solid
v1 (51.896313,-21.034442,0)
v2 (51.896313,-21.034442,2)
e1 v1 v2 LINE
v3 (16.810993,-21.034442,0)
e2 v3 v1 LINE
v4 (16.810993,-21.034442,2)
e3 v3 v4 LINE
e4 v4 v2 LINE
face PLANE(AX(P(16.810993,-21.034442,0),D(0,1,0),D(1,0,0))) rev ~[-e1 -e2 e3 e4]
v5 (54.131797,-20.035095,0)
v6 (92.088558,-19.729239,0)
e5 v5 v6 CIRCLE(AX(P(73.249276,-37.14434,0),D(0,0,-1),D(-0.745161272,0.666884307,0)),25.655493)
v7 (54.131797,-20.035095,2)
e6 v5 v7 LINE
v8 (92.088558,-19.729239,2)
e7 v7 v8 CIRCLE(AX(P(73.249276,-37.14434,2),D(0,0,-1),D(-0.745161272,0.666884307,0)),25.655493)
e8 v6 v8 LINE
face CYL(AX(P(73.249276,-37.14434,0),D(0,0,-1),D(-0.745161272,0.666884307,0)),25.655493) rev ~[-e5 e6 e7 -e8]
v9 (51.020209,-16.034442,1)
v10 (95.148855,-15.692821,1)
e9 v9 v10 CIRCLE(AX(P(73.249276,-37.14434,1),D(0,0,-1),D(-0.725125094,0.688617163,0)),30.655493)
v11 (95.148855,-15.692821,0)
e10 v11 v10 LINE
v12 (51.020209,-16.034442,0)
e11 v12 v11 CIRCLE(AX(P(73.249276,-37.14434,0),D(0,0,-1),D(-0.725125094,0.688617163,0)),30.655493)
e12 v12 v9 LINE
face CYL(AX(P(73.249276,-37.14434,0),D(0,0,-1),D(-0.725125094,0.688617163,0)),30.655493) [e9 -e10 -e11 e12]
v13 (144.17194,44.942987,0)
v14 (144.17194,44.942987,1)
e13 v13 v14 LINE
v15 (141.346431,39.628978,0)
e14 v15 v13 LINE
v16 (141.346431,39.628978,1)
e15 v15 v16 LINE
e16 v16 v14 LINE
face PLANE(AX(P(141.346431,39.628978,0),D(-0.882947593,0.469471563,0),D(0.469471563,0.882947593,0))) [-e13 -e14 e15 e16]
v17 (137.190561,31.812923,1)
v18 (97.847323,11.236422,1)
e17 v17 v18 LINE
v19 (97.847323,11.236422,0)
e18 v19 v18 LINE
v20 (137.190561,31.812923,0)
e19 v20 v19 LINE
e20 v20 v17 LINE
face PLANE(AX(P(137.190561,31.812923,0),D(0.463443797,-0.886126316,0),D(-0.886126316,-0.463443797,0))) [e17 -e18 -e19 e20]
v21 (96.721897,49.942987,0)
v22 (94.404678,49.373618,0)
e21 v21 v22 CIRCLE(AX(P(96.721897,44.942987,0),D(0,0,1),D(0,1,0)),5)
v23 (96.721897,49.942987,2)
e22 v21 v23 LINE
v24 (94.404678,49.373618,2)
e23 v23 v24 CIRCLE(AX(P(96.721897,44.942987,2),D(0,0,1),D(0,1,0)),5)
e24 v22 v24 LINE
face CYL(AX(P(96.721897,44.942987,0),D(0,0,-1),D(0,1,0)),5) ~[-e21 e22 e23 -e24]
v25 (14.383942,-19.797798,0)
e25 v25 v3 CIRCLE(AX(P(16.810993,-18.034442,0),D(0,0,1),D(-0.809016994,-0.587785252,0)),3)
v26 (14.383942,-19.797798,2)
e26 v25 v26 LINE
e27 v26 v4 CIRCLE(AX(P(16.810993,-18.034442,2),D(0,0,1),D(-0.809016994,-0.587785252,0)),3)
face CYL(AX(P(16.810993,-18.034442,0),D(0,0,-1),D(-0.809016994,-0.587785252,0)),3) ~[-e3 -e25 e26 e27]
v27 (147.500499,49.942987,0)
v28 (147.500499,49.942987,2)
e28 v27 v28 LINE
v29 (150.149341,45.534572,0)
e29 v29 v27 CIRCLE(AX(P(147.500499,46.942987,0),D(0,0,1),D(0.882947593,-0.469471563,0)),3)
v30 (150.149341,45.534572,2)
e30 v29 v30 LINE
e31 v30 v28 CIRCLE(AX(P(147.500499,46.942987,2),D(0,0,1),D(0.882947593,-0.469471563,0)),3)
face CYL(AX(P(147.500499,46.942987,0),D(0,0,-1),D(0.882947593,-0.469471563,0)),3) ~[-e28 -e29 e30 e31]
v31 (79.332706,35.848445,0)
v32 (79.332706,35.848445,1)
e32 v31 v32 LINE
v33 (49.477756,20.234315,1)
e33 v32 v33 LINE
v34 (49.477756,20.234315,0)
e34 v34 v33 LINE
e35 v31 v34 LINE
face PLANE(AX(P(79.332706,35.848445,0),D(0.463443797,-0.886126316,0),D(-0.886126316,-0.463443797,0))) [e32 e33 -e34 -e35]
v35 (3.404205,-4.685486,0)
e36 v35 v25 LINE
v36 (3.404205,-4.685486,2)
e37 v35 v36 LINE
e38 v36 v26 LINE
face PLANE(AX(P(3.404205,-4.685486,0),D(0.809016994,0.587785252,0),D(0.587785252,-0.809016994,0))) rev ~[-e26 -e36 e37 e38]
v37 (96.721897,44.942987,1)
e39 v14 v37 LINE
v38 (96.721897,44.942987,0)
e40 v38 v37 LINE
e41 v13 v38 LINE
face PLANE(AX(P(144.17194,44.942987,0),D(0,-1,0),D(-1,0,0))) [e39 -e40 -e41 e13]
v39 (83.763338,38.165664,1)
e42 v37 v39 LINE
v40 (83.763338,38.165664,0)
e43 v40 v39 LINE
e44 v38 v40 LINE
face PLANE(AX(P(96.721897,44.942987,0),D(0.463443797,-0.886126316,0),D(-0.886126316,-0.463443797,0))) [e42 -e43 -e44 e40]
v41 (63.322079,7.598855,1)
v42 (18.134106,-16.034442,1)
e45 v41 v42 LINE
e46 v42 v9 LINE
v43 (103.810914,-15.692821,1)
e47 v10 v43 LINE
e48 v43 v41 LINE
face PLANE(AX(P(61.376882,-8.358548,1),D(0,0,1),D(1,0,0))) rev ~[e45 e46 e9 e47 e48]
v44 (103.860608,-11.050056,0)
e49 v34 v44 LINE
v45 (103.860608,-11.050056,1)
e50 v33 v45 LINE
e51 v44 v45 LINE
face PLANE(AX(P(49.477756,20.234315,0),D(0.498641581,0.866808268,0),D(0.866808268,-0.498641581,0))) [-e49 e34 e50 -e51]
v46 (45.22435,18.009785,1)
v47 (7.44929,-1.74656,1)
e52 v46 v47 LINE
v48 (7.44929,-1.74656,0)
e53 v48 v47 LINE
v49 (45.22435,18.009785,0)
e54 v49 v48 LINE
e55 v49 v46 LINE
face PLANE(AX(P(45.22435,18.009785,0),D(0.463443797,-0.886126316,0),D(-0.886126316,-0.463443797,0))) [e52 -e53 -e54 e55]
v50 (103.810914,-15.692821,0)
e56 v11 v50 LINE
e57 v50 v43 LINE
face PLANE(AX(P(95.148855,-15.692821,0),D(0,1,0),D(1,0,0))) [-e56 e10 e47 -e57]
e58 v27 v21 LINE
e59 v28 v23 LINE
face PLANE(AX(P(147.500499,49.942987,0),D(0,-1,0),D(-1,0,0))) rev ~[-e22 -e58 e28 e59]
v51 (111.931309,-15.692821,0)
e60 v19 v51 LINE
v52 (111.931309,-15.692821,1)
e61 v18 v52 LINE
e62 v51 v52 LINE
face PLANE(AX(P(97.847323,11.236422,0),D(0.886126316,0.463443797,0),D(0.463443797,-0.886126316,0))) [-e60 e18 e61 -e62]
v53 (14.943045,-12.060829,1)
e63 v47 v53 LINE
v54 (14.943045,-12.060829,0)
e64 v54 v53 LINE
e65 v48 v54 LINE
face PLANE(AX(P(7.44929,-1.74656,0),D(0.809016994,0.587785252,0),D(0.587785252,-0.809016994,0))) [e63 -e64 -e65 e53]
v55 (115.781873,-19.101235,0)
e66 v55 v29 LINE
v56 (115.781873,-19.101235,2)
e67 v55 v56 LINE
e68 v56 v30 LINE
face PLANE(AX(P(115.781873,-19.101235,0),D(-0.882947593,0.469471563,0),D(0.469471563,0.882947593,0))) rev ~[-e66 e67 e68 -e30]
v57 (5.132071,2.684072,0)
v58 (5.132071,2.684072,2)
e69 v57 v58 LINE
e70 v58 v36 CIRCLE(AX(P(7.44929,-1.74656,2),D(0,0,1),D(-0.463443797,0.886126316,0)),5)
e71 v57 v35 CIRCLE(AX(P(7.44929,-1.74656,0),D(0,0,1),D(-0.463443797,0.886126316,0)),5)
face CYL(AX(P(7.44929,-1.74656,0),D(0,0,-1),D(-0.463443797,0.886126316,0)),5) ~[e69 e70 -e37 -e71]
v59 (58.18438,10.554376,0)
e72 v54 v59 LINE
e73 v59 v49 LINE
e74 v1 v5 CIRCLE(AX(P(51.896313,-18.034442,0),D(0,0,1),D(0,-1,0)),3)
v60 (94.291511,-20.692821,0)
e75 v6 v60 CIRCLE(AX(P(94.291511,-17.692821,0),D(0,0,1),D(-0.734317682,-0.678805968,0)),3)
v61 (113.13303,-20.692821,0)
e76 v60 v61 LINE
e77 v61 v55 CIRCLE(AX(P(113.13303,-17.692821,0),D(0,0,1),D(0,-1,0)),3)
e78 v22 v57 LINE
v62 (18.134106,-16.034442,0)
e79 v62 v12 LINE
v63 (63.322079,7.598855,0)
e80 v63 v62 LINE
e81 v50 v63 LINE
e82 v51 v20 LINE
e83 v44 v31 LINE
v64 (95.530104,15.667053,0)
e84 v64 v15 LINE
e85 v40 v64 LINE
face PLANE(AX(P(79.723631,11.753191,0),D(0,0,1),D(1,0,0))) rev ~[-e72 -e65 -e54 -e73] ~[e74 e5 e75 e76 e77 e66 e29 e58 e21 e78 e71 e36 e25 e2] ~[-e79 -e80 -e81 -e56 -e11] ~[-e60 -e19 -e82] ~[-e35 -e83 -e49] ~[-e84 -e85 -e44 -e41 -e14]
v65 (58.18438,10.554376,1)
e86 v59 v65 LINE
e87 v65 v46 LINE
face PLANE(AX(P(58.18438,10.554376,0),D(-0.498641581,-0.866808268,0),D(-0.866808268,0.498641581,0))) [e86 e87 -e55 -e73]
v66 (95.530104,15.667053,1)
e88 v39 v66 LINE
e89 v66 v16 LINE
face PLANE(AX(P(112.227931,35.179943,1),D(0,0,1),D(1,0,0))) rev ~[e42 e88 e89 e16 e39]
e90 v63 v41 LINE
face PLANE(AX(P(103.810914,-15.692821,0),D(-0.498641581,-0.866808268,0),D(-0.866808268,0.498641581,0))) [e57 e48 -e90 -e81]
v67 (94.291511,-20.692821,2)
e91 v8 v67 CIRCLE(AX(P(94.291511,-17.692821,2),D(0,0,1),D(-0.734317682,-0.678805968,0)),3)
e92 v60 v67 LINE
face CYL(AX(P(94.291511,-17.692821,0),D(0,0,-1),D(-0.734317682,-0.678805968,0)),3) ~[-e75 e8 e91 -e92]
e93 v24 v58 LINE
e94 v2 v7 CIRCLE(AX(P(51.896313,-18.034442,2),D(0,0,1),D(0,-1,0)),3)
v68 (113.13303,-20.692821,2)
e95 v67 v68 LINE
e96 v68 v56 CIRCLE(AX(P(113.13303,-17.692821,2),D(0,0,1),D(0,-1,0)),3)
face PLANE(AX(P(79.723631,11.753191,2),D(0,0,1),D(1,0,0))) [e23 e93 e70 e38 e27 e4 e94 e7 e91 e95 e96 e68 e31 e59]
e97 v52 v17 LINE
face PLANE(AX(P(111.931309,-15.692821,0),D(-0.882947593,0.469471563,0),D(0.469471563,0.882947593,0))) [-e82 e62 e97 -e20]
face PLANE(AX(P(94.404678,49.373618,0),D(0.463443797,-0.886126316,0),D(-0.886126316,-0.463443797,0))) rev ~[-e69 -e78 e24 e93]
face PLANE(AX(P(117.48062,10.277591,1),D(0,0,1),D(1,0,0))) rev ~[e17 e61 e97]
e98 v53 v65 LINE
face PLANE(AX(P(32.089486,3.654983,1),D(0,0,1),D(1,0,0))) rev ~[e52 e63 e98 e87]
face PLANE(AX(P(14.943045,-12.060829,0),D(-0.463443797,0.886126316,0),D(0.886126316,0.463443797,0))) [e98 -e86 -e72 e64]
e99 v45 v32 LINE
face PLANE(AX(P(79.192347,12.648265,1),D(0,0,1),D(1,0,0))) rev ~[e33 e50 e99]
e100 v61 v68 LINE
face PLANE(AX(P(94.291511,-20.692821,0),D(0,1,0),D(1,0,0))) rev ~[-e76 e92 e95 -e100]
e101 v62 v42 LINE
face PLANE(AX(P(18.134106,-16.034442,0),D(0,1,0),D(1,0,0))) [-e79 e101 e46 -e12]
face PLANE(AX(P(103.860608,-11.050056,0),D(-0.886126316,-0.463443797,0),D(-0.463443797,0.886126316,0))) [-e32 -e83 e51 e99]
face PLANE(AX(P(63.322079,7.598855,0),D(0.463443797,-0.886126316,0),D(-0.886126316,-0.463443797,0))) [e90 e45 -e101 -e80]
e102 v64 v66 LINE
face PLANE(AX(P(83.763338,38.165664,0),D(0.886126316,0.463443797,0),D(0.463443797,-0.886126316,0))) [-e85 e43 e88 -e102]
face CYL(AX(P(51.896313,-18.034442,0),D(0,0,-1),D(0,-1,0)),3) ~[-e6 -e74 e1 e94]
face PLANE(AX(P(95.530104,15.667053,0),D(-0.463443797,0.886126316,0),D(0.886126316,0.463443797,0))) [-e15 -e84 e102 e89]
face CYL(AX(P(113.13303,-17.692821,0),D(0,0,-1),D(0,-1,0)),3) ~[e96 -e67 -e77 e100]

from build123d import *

# Parameters (mm, degrees)
F1_DEPTH = 2
F2_DEPTH = 1


# Not quite as in the source:
# - a feature names something its author has since deleted; it is built from what else it names


with BuildPart() as f1:
    # F0 (on Top) → F1 (new body)
    with BuildSketch(Plane.XY):
        with BuildLine():
            ThreePointArc((5.132071007, 2.6840715959), (2.5813003046, -0.6052114789), (3.40420502, -4.6854862431))
            Line((3.40420502, -4.6854862431), (14.383941925, -19.7977976106))
            ThreePointArc((14.383941925, -19.7977976106), (15.4490214089, -20.7074614263), (16.8109929081, -21.0344418537))
            Line((16.8109929081, -21.0344418537), (51.8963127054, -21.0344418537))
            ThreePointArc((51.8963127054, -21.0344418537), (53.12065768, -20.7732334455), (54.1317965199, -20.035094776))
            ThreePointArc((54.1317965199, -20.035094776), (73.0425506447, -11.4896803777), (92.0885582947, -19.7292387035))
            ThreePointArc((92.0885582947, -19.7292387035), (93.0892746148, -20.4413889466), (94.2915113407, -20.6928208003))
            Line((94.2915113407, -20.6928208003), (113.1330302084, -20.6928208003))
            ThreePointArc((113.1330302084, -20.6928208003), (114.6781444331, -20.2643227024), (115.781872987, -19.1012354886))
            Line((115.781872987, -19.1012354886), (150.1493414199, 45.5345719401))
            ThreePointArc((150.1493414199, 45.5345719401), (150.0720005434, 48.4881008532), (147.5004986413, 49.9429866284))
            Line((147.5004986413, 49.9429866284), (96.7218968968, 49.9429866284))
            ThreePointArc((96.7218968968, 49.9429866284), (95.5288247883, 49.7985585766), (94.4046779119, 49.373618206))
            Line((94.4046779119, 49.373618206), (5.132071007, 2.6840715959))
        make_face()
        with BuildLine():
            Line((83.7633376258, 38.1656639161), (96.7218969194, 44.9429865363))
            Line((96.7218969194, 44.9429865363), (144.1719395233, 44.9429865363))
            Line((144.1719395233, 44.9429865363), (141.3464313092, 39.6289784601))
            Line((141.3464313092, 39.6289784601), (137.1905609573, 31.8129231027))
            Line((137.1905609573, 31.8129231027), (111.931308915, -15.6928207082))
            Line((111.931308915, -15.6928207082), (103.8109142352, -15.6928207082))
            Line((103.8109142352, -15.6928207082), (95.14885507, -15.6928207082))
            ThreePointArc((95.14885507, -15.6928207082), (73.0119644332, -6.489765959), (51.0202089869, -16.0344417616))
            Line((51.0202089869, -16.0344417616), (18.1341059978, -16.0344417616))
            Line((18.1341059978, -16.0344417616), (17.830043854, -16.0344417616))
            Line((17.830043854, -16.0344417616), (14.9430452948, -12.0608291403))
            Line((14.9430452948, -12.0608291403), (7.4492901291, -1.7465600138))
            Line((7.4492901291, -1.7465600138), (45.2243497545, 18.0097848295))
            Line((45.2243497545, 18.0097848295), (49.4777560689, 20.234315055))
            Line((49.4777560689, 20.234315055), (79.3327060482, 35.8484449312))
            Line((79.3327060482, 35.8484449312), (83.7633376258, 38.1656639161))
        make_face(mode=Mode.SUBTRACT)
        Polygon((144.1719395233, 44.9429865363), (96.7218969194, 44.9429865363), (83.7633376258, 38.1656639161), (95.5301042855, 15.6670531815), (141.3464313092, 39.6289784601), align=None)
        Polygon((103.8606077396, -11.0500555872), (79.3327060482, 35.8484449312), (49.4777560689, 20.234315055), align=None)
        Polygon((58.1843801115, 10.554375987), (45.2243497545, 18.0097848295), (7.4492901291, -1.7465600138), (14.9430452948, -12.0608291403), align=None)
        Polygon((95.5301042855, 15.6670531815), (83.7633376258, 38.1656639161), (79.3327060482, 35.8484449312), (103.8606077396, -11.0500555872), (49.4777560689, 20.234315055), (45.2243497545, 18.0097848295), (58.1843801115, 10.554375987), (14.9430452948, -12.0608291403), (17.830043854, -16.0344417616), (18.1341059978, -16.0344417616), (63.3220791259, 7.5988546181), (103.8109142352, -15.6928207082), (111.931308915, -15.6928207082), (97.8473232704, 11.236421604), (137.1905609573, 31.8129231027), (141.3464313092, 39.6289784601), align=None)
        with BuildLine():
            Line((95.14885507, -15.6928207082), (103.8109142352, -15.6928207082))
            Line((103.8109142352, -15.6928207082), (63.3220791259, 7.5988546181))
            Line((63.3220791259, 7.5988546181), (18.1341059978, -16.0344417616))
            Line((18.1341059978, -16.0344417616), (51.0202089869, -16.0344417616))
            ThreePointArc((51.0202089869, -16.0344417616), (73.0119644332, -6.489765959), (95.14885507, -15.6928207082))
        make_face()
        Polygon((111.931308915, -15.6928207082), (137.1905609573, 31.8129231027), (97.8473232704, 11.236421604), align=None)
    extrude(amount=F1_DEPTH)

    # F0 (on Top) → F2 (cut)
    with BuildSketch(Plane.XY):
        Polygon((144.1719395233, 44.9429865363), (96.7218969194, 44.9429865363), (83.7633376258, 38.1656639161), (95.5301042855, 15.6670531815), (141.3464313092, 39.6289784601), align=None)
        Polygon((103.8606077396, -11.0500555872), (79.3327060482, 35.8484449312), (49.4777560689, 20.234315055), align=None)
        Polygon((111.931308915, -15.6928207082), (137.1905609573, 31.8129231027), (97.8473232704, 11.236421604), align=None)
        Polygon((58.1843801115, 10.554375987), (45.2243497545, 18.0097848295), (7.4492901291, -1.7465600138), (14.9430452948, -12.0608291403), align=None)
        with BuildLine():
            Line((95.14885507, -15.6928207082), (103.8109142352, -15.6928207082))
            Line((103.8109142352, -15.6928207082), (63.3220791259, 7.5988546181))
            Line((63.3220791259, 7.5988546181), (18.1341059978, -16.0344417616))
            Line((18.1341059978, -16.0344417616), (51.0202089869, -16.0344417616))
            ThreePointArc((51.0202089869, -16.0344417616), (73.0119644332, -6.489765959), (95.14885507, -15.6928207082))
        make_face()
    extrude(amount=F2_DEPTH, mode=Mode.SUBTRACT)


solid = f1.part
